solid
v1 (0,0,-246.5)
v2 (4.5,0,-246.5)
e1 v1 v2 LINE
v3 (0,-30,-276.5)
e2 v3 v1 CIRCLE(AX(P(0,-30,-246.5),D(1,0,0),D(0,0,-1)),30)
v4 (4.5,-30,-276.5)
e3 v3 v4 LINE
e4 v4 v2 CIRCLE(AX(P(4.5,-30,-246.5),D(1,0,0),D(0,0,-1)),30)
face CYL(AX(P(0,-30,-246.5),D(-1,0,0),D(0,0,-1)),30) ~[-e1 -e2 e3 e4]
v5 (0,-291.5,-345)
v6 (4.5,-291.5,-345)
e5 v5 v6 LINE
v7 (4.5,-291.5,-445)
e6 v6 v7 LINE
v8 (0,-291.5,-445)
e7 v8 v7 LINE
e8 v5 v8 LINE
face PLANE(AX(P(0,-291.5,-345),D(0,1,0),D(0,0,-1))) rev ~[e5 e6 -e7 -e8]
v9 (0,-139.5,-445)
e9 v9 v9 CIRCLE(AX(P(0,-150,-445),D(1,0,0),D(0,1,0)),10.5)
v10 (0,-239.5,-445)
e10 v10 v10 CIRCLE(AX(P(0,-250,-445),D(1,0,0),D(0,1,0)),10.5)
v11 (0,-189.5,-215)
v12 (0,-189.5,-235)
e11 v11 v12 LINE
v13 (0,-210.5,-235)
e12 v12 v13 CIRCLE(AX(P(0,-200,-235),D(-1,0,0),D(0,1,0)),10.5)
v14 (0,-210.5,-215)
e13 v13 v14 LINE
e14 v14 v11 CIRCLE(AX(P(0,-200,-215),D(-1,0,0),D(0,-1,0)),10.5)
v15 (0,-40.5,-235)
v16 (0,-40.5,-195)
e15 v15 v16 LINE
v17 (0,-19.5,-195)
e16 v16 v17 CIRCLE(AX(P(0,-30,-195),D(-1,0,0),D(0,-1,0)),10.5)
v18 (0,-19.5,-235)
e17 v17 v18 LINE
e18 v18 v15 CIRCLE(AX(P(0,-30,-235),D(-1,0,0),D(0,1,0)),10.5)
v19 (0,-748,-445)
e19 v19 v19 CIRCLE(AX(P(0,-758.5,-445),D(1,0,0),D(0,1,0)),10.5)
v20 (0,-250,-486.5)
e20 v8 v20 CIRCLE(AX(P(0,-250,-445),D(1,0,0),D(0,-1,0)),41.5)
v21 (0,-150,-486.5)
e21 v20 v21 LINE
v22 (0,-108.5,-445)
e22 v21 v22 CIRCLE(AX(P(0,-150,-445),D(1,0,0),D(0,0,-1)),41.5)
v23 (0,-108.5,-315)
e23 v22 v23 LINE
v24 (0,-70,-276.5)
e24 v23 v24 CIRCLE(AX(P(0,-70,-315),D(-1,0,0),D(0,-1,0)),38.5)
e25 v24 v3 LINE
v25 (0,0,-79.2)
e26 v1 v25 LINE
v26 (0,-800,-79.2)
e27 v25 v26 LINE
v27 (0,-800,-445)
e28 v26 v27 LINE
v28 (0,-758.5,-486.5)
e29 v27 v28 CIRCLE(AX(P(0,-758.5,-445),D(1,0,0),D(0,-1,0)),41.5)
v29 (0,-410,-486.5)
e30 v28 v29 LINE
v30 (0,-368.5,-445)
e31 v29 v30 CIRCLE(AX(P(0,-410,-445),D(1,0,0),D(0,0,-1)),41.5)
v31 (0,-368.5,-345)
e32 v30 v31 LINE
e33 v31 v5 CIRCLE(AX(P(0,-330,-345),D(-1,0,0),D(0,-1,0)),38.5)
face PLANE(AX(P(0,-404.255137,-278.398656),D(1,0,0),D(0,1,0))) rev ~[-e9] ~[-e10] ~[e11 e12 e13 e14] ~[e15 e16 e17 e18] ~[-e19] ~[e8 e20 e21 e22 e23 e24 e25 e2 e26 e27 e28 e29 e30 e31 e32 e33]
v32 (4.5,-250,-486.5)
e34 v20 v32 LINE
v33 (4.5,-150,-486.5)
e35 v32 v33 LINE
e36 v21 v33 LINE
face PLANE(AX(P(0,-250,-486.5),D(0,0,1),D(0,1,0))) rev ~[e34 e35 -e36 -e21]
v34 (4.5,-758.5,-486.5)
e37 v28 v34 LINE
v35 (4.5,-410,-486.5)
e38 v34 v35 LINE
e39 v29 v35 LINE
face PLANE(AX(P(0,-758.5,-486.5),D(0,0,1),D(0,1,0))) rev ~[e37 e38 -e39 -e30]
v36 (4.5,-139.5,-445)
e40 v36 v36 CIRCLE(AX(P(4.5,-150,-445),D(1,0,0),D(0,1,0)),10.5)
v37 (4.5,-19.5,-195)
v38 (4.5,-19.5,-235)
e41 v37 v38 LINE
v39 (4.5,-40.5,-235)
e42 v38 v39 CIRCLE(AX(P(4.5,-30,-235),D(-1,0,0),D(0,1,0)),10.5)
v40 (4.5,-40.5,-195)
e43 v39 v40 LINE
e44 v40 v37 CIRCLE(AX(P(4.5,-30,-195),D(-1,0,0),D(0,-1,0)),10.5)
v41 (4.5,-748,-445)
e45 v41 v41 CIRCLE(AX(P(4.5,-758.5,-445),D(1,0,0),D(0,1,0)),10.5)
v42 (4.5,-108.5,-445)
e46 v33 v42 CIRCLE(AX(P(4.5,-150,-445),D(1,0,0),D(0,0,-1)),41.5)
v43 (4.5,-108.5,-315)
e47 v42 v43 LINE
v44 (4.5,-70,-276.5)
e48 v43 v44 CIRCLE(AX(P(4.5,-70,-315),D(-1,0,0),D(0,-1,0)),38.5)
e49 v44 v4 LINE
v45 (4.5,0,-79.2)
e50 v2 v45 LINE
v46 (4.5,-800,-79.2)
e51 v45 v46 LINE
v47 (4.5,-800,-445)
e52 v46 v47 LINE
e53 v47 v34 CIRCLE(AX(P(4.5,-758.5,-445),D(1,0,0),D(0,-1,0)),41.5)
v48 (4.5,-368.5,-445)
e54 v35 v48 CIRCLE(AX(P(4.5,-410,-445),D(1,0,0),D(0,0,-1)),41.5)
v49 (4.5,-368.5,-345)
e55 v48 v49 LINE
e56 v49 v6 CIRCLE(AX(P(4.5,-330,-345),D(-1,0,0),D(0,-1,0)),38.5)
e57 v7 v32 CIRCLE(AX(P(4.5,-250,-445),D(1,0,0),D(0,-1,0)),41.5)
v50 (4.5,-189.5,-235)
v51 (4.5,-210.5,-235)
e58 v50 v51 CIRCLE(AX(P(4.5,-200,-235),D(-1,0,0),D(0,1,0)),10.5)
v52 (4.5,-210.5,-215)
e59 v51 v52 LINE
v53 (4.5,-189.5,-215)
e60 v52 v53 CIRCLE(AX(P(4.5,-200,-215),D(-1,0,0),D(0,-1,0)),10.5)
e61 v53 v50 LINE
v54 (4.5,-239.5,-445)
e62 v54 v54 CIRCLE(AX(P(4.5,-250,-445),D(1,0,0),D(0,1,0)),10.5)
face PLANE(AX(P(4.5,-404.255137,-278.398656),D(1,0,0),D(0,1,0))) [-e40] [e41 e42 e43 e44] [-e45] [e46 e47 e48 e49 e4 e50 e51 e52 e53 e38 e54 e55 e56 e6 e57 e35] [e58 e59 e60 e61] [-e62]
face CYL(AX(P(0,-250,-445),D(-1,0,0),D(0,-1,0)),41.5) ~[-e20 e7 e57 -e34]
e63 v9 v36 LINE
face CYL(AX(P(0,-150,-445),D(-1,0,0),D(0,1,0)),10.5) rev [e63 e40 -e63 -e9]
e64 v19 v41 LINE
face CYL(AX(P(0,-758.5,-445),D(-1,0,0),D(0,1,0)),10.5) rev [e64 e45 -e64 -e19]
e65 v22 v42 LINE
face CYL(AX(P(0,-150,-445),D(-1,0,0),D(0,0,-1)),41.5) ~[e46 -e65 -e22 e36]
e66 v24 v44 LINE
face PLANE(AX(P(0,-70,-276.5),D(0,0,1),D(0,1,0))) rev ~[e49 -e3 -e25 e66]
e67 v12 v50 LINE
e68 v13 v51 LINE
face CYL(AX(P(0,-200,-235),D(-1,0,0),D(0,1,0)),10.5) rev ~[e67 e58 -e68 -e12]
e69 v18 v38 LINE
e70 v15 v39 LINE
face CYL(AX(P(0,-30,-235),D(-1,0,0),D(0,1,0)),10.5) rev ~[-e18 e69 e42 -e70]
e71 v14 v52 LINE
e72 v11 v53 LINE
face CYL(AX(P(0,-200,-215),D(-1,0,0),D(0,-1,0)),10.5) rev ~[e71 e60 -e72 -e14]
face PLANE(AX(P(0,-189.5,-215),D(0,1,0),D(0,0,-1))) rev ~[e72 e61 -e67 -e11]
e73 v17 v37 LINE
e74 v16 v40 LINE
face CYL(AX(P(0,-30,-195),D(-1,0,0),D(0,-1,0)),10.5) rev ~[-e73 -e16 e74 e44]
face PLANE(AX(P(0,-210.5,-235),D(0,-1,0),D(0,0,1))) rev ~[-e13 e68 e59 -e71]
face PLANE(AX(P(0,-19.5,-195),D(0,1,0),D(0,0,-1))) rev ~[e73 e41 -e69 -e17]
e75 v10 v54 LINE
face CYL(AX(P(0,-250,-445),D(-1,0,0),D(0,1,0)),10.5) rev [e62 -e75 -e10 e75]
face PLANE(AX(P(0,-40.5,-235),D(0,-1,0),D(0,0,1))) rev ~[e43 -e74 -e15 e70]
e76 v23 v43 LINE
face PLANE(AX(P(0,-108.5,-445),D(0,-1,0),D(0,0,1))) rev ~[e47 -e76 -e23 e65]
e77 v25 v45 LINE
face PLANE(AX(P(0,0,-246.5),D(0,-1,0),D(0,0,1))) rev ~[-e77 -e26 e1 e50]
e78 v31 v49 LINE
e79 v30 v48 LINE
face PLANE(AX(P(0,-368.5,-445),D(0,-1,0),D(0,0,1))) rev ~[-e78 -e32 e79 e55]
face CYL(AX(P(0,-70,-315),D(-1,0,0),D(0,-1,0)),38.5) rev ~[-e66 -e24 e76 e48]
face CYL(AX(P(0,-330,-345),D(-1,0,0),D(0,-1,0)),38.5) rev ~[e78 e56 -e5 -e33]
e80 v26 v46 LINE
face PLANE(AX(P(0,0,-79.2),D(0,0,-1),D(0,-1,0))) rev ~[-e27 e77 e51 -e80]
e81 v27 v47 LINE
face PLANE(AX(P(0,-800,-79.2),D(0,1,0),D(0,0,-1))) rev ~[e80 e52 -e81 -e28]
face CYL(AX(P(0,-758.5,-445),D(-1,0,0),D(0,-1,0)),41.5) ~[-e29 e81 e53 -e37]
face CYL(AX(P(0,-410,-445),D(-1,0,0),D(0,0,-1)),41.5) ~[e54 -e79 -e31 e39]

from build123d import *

# Parameters (mm, degrees)
F0_R     = 10.5
F1_DEPTH = 4.5


# Not quite as in the source:
# - a feature names something its author has since deleted; it is built from what else it names


with BuildPart() as f1:
    # F0 (on Right) → F1 (new body)
    with BuildSketch(Plane.YZ):
        with BuildLine():
            Line((-800, -79.2), (-800, -246.5))
            Line((-800, -246.5), (-800, -445))
            ThreePointArc((-800, -445), (-787.8449314192, -474.3449314192), (-758.5, -486.5))
            Line((-758.5, -486.5), (-410, -486.5))
            ThreePointArc((-410, -486.5), (-380.6550685808, -474.3449314192), (-368.5, -445))
            Line((-368.5, -445), (-368.5, -345))
            ThreePointArc((-368.5, -345), (-330, -306.5), (-291.5, -345))
            Line((-291.5, -345), (-291.5, -445))
            ThreePointArc((-291.5, -445), (-279.3449314192, -474.3449314192), (-250, -486.5))
            Line((-250, -486.5), (-150, -486.5))
            ThreePointArc((-150, -486.5), (-120.6550685808, -474.3449314192), (-108.5, -445))
            Line((-108.5, -445), (-108.5, -315))
            ThreePointArc((-108.5, -315), (-97.2236110757, -287.7763889243), (-70, -276.5))
            Line((-70, -276.5), (-30, -276.5))
            ThreePointArc((-30, -276.5), (-8.7867965644, -267.7132034356), (0, -246.5))
            Line((0, -246.5), (0, -79.2))
            Line((0, -79.2), (-800, -79.2))
        make_face()
        with Locations((-758.5, -445)):
            Circle(F0_R, mode=Mode.SUBTRACT)
        with Locations((-250, -445)):
            Circle(F0_R, mode=Mode.SUBTRACT)
        with Locations((-150, -445)):
            Circle(F0_R, mode=Mode.SUBTRACT)
        with BuildLine():
            ThreePointArc((-210.5, -215), (-200, -204.5), (-189.5, -215))
            Line((-189.5, -215), (-189.5, -235))
            ThreePointArc((-189.5, -235), (-200, -245.5), (-210.5, -235))
            Line((-210.5, -235), (-210.5, -215))
        make_face(mode=Mode.SUBTRACT)
        with BuildLine():
            ThreePointArc((-40.5, -195), (-30, -184.5), (-19.5, -195))
            Line((-19.5, -195), (-19.5, -235))
            ThreePointArc((-19.5, -235), (-30, -245.5), (-40.5, -235))
            Line((-40.5, -235), (-40.5, -195))
        make_face(mode=Mode.SUBTRACT)
    extrude(amount=F1_DEPTH)


solid = f1.part
